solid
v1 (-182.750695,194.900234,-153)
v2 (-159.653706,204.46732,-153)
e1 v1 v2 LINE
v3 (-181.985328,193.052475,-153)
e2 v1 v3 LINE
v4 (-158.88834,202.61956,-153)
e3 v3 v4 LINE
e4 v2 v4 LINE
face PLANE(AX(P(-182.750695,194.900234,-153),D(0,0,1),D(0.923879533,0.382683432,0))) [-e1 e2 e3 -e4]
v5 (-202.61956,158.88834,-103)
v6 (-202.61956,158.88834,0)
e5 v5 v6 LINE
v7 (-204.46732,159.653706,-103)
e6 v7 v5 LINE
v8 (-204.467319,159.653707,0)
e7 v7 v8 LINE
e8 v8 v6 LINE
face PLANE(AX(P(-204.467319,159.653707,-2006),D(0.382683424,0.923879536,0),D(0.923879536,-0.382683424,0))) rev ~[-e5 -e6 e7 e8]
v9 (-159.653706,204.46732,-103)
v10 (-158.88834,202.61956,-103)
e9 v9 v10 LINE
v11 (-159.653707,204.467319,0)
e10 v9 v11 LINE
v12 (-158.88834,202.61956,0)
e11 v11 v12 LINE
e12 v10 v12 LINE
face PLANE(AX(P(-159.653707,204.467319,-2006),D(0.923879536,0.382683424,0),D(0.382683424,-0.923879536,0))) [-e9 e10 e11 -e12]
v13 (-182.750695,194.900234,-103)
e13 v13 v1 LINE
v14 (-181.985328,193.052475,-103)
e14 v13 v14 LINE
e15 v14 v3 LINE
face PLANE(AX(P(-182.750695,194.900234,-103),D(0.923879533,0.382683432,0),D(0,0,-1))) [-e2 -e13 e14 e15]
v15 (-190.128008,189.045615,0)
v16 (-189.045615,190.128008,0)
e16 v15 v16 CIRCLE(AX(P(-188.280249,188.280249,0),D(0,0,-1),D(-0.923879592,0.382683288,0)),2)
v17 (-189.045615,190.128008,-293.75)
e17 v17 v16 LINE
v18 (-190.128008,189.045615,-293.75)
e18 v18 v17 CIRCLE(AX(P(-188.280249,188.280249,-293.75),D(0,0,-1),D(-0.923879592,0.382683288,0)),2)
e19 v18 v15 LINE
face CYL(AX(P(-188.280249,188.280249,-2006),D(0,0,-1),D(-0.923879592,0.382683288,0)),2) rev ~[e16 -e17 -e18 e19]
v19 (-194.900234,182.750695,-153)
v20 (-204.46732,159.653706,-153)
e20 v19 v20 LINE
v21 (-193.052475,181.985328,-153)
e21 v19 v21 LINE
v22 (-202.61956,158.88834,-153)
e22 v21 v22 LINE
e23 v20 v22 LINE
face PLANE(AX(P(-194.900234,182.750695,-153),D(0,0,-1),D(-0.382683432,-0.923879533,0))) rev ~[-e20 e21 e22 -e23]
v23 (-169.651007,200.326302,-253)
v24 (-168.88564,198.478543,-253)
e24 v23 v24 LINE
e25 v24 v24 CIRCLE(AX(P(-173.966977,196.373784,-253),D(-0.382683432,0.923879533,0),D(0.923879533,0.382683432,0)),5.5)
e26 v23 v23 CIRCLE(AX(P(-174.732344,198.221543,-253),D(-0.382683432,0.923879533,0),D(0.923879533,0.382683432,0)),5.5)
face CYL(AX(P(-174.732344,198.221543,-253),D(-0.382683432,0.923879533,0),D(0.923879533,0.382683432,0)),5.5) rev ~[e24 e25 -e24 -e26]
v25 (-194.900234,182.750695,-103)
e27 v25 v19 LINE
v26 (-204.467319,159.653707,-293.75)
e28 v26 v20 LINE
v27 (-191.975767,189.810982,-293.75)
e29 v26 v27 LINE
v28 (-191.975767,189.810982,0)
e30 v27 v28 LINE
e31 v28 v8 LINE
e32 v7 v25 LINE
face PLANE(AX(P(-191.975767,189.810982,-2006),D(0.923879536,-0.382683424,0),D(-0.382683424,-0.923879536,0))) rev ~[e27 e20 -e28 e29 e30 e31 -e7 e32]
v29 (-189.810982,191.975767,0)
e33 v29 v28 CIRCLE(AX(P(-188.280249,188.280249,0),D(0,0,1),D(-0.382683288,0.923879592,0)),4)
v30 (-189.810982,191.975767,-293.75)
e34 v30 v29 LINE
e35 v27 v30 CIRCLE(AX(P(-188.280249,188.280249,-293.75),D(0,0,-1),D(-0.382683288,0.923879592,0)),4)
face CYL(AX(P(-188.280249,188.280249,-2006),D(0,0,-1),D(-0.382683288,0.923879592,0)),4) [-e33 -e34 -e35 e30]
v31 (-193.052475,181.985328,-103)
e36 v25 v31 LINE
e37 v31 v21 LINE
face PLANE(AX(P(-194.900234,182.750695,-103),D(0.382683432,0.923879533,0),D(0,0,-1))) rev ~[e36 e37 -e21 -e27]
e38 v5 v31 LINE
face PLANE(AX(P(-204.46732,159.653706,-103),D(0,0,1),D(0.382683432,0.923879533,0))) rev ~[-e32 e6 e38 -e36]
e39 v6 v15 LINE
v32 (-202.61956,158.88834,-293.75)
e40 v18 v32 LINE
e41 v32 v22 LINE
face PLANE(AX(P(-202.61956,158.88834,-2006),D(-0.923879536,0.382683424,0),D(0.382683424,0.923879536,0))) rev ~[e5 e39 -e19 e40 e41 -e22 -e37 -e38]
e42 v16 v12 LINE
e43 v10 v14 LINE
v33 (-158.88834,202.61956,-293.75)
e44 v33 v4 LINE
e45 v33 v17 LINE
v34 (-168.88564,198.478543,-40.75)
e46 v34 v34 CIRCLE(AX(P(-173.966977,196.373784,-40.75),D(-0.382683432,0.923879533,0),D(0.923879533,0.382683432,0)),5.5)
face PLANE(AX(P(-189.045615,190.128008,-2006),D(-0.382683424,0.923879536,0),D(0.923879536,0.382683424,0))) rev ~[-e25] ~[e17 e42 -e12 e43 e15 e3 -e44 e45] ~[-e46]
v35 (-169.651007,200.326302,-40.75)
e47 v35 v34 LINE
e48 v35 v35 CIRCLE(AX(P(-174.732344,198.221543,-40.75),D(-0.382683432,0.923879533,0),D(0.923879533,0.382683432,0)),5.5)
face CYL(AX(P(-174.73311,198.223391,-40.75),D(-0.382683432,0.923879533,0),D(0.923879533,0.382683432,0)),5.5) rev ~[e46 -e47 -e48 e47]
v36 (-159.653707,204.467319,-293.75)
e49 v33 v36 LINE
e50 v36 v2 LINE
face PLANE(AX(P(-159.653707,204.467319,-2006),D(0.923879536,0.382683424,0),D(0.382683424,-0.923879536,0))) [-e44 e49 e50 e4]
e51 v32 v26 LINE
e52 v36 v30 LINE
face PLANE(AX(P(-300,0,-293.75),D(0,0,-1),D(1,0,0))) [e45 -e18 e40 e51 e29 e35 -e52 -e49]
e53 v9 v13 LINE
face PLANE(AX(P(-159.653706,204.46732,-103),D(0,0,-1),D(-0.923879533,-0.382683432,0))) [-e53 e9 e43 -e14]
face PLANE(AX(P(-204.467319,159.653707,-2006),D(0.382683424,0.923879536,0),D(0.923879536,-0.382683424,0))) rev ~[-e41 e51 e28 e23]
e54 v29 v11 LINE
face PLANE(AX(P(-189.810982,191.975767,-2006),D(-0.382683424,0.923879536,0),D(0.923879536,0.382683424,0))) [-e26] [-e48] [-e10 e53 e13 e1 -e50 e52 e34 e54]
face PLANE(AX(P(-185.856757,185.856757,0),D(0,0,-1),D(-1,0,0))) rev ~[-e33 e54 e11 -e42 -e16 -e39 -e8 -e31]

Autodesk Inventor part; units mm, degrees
ref_plane "YZ Plane" through (0, 0, 0) normal (1, 0, 0) x (0, 1, 0)
ref_plane "XZ Plane" through (0, 0, 0) normal (0, 1, 0) x (-1, 0, 0)
ref_plane "XY Plane" through (0, 0, 0) normal (0, 0, 1) x (1, 0, 0)
sketch "Sketch4" plane through (0, 0, 0) normal (0, 0, 1) x (1, 0, 0)
  line L0 (-193.637817, 193.637817) -> (0, 273.845227) construction
  line L1 (0, 273.845227) -> (193.637817, 193.637817) construction
  line L2 (193.637817, 193.637817) -> (273.845227, 0) construction
  line L3 (273.845227, 0) -> (193.637817, -193.637817) construction
  line L4 (193.637817, -193.637817) -> (0, -273.845227) construction
  line L5 (0, -273.845227) -> (-193.637817, -193.637817) construction
  line L6 (-193.637817, -193.637817) -> (-273.845227, 0) construction
  line L7 (-273.845227, 0) -> (-193.637817, 193.637817) construction
  line L8 (-191.341716, 191.341716) -> (0, 270.59805) construction
  line L9 (0, 270.59805) -> (191.341716, 191.341716) construction
  line L10 (191.341716, 191.341716) -> (270.59805, 0) construction
  line L11 (270.59805, 0) -> (191.341716, -191.341716) construction
  line L12 (191.341716, -191.341716) -> (0, -270.59805) construction
  line L13 (0, -270.59805) -> (-191.341716, -191.341716) construction
  line L14 (-191.341716, -191.341716) -> (-270.59805, 0) construction
  line L15 (-270.59805, 0) -> (-191.341716, 191.341716) construction
  line L16 (-189.810982, 191.975767) -> (-159.653707, 204.467319)
  line L17 (-191.975767, 189.810982) -> (-204.467319, 159.653707)
  arc A0 (-189.810982, 191.975767) -> (-191.975767, 189.810982) centre (-188.280249, 188.280249) ccw
  point P0 (0, 0)
  point P1 (0, 0)
  point P2 (0, 0)
  dimension "d16" = 506
  dimension "d22" = 3
  dimension "d23" = 32.642
  dimension "d24" = 4
contour flange "Contour Flange1" sketch "Sketch4" thickness 2 bend radius 2 width 2006 along (0, 0, -1) mid plane no both sides no wall seen from (-174.732345, 198.221543, 0) lies toward (0.3826834, -0.9238795, 0) curves L16 A0 L17
bend "Bend2"
corner "Corner2"
sketch "Sketch6" plane through (-189.810982, 191.975767, 0) normal (-0.3826834, 0.9238795, 0) x (0.9238795, 0.3826834, 0)
  circle A0 centre (16.321, 40.75) radius 5.5
  line L0 (32.642, 0) -> (0, 0) projected
  circle A1 centre (16.321, 1965.25) radius 5.5
  line L1 (32.642, 2006) -> (0, 2006) projected
  point P0 (101.896536, 0)
  point P1 (16.321, 0)
  point P2 (16.321, 0)
  point P3 (16.321, 0)
  point P4 (16.321, 0)
  point P5 (16.321, 2006)
  point P6 (16.321, 2006)
  dimension "d36" = 11
  dimension "d37" = 40.75
  dimension "d40" = 40.75
  dimension "d41" = 11
extrude "Extrusion1" cut sketch "Sketch6" against normal up to surface (2 mm away)
sketch "Sketch10" plane through (-189.810982, 191.975767, 0) normal (-0.3826834, 0.9238795, 0) x (0.9238795, 0.3826834, 0)
  line L0 (7.642, 1153) -> (32.642, 1153)
  line L1 (32.642, 1153) -> (32.642, 1103)
  line L2 (32.642, 1103) -> (7.642, 1103)
  line L3 (7.642, 1103) -> (7.642, 1153)
  line L4 (32.642, 2006) -> (0, 2006) projected
  line L5 (0, 0) -> (0, 2006) projected
  point P0 (0, 1003)
  point P1 (7.642, 1128)
  dimension "d70" = 50
  dimension "d71" = 25
  dimension "d72" = 125
extrude "Extrusion5" cut sketch "Sketch10" against normal through all
sketch "Sketch12" plane through (-191.975767, 189.810982, -2006) normal (-0.9238795, 0.3826834, 0) x (0, 0, 1)
  line L0 (853, -32.642) -> (903, -32.642)
  line L1 (903, -32.642) -> (903, -7.642)
  line L2 (903, -7.642) -> (853, -7.642)
  line L3 (853, -7.642) -> (853, -32.642)
  line L4 (2006, 0) -> (0, 0) projected
  point P0 (2006, -101.896536)
  point P1 (0, -32.642)
  point P2 (1003, 0)
  point P3 (878, -7.642)
  dimension "d75" = 50
  dimension "d76" = 25
  dimension "d77" = 125
extrude "Extrusion6" cut sketch "Sketch12" against normal through all
pattern_linear "Rectangular Pattern4" count 8 spacing 250 along (0, 0, 1) of "Extrusion6", "Extrusion5" first direction both ways yes
sketch "Sketch13" plane through (-189.810982, 191.975767, 0) normal (-0.3826834, 0.9238795, 0) x (0.9238795, 0.3826834, 0)
  circle A0 centre (16.321, 1003) radius 5.5
  line L0 (32.642, 903) -> (32.642, 1103) projected
  line L1 (32.642, 0) -> (0, 0) projected
  point P0 (101.896536, 0)
  point P1 (32.642, 1003)
  point P2 (16.321, 0)
  dimension "d83" = 11
extrude "Extrusion7" cut sketch "Sketch13" against normal through all
pattern_linear "Rectangular Pattern5" count 7 spacing 250 along (0, 0, 1) of "Extrusion7" first direction both ways yes
sketch "Sketch14" plane through (0, 0, 0) normal (0, 1, 0) x (-1, 0, 0)
  line L0 (-300, 0) -> (300, 0) construction
  line L1 (300, 0) -> (300, -1712.25)
  line L2 (300, -1712.25) -> (-300, -1712.25)
  line L3 (-300, -1712.25) -> (-300, 0)
  line L4 (159.653707, -2006) -> (189.810982, -2006)
  line L5 (300, -293.75) -> (-300, -293.75)
  line L6 (300, -2006) -> (-300, -2006)
  line L7 (-300, -2006) -> (-300, -1712.25)
  line L8 (300, -2006) -> (300, -1712.25)
  point P0 (0, 0)
  point P1 (0, 0)
  dimension "d89" = 600
  dimension "d90" = 1712.25
  dimension "d94" = 293.75
  dimension "d95" = 293.75
extrude "Extrusion8" cut sketch "Sketch14" along normal blind 600
equation "\"d40\" = d37"
equation "\"d72\" = Отступ_окна_от_середины"
equation "\"d77\" = Отступ_окна_от_середины"
equation "\"d16\" = Барабан_габарит_по_кассетам"
equation "\"d24\" = BendRadius + Thickness"
equation "\"d41\" = d36"
equation "\"d70\" = Ширина_окна_барабан"
equation "\"d75\" = Ширина_окна_барабан"
equation "\"d25\" = Thickness"
equation "\"d26\" = BendReliefWidth"
equation "\"d27\" = BendReliefDepth"
equation "\"d28\" = MinimumRemnant"
equation "\"d29\" = TransitionRadius"
equation "\"d30\" = Барабан_длина_листа"
equation "\"d31\" = BendRadius"
equation "\"d33\" = CornerReliefSize"
equation "\"d34\" = GapSize"
equation "\"d35\" = JacobiRadiusSize"
equation "\"BendRadius\" = Thickness"
equation "\"BendReliefWidth\" = Thickness"
equation "\"BendReliefDepth\" = 0.5 * Thickness"
equation "\"CornerReliefSize\" = 4 * Thickness"
equation "\"MinimumRemnant\" = 2 * Thickness"
equation "\"TransitionRadius\" = BendRadius"
equation "\"JacobiRadiusSize\" = BendRadius"
equation "\"GapSize\" = Thickness"
equation "\"Барабан_габарит_по_кассетам\" = 506"
equation "\"Thickness\" = 2"
equation "\"Ширина_окна_барабан\" = 50"
equation "\"Барабан_длина_листа\" = 2006"
equation "\"Отступ_окна_от_середины\" = 125"
properties part number "ДМС 103 Полка для крышки ПВГ"
